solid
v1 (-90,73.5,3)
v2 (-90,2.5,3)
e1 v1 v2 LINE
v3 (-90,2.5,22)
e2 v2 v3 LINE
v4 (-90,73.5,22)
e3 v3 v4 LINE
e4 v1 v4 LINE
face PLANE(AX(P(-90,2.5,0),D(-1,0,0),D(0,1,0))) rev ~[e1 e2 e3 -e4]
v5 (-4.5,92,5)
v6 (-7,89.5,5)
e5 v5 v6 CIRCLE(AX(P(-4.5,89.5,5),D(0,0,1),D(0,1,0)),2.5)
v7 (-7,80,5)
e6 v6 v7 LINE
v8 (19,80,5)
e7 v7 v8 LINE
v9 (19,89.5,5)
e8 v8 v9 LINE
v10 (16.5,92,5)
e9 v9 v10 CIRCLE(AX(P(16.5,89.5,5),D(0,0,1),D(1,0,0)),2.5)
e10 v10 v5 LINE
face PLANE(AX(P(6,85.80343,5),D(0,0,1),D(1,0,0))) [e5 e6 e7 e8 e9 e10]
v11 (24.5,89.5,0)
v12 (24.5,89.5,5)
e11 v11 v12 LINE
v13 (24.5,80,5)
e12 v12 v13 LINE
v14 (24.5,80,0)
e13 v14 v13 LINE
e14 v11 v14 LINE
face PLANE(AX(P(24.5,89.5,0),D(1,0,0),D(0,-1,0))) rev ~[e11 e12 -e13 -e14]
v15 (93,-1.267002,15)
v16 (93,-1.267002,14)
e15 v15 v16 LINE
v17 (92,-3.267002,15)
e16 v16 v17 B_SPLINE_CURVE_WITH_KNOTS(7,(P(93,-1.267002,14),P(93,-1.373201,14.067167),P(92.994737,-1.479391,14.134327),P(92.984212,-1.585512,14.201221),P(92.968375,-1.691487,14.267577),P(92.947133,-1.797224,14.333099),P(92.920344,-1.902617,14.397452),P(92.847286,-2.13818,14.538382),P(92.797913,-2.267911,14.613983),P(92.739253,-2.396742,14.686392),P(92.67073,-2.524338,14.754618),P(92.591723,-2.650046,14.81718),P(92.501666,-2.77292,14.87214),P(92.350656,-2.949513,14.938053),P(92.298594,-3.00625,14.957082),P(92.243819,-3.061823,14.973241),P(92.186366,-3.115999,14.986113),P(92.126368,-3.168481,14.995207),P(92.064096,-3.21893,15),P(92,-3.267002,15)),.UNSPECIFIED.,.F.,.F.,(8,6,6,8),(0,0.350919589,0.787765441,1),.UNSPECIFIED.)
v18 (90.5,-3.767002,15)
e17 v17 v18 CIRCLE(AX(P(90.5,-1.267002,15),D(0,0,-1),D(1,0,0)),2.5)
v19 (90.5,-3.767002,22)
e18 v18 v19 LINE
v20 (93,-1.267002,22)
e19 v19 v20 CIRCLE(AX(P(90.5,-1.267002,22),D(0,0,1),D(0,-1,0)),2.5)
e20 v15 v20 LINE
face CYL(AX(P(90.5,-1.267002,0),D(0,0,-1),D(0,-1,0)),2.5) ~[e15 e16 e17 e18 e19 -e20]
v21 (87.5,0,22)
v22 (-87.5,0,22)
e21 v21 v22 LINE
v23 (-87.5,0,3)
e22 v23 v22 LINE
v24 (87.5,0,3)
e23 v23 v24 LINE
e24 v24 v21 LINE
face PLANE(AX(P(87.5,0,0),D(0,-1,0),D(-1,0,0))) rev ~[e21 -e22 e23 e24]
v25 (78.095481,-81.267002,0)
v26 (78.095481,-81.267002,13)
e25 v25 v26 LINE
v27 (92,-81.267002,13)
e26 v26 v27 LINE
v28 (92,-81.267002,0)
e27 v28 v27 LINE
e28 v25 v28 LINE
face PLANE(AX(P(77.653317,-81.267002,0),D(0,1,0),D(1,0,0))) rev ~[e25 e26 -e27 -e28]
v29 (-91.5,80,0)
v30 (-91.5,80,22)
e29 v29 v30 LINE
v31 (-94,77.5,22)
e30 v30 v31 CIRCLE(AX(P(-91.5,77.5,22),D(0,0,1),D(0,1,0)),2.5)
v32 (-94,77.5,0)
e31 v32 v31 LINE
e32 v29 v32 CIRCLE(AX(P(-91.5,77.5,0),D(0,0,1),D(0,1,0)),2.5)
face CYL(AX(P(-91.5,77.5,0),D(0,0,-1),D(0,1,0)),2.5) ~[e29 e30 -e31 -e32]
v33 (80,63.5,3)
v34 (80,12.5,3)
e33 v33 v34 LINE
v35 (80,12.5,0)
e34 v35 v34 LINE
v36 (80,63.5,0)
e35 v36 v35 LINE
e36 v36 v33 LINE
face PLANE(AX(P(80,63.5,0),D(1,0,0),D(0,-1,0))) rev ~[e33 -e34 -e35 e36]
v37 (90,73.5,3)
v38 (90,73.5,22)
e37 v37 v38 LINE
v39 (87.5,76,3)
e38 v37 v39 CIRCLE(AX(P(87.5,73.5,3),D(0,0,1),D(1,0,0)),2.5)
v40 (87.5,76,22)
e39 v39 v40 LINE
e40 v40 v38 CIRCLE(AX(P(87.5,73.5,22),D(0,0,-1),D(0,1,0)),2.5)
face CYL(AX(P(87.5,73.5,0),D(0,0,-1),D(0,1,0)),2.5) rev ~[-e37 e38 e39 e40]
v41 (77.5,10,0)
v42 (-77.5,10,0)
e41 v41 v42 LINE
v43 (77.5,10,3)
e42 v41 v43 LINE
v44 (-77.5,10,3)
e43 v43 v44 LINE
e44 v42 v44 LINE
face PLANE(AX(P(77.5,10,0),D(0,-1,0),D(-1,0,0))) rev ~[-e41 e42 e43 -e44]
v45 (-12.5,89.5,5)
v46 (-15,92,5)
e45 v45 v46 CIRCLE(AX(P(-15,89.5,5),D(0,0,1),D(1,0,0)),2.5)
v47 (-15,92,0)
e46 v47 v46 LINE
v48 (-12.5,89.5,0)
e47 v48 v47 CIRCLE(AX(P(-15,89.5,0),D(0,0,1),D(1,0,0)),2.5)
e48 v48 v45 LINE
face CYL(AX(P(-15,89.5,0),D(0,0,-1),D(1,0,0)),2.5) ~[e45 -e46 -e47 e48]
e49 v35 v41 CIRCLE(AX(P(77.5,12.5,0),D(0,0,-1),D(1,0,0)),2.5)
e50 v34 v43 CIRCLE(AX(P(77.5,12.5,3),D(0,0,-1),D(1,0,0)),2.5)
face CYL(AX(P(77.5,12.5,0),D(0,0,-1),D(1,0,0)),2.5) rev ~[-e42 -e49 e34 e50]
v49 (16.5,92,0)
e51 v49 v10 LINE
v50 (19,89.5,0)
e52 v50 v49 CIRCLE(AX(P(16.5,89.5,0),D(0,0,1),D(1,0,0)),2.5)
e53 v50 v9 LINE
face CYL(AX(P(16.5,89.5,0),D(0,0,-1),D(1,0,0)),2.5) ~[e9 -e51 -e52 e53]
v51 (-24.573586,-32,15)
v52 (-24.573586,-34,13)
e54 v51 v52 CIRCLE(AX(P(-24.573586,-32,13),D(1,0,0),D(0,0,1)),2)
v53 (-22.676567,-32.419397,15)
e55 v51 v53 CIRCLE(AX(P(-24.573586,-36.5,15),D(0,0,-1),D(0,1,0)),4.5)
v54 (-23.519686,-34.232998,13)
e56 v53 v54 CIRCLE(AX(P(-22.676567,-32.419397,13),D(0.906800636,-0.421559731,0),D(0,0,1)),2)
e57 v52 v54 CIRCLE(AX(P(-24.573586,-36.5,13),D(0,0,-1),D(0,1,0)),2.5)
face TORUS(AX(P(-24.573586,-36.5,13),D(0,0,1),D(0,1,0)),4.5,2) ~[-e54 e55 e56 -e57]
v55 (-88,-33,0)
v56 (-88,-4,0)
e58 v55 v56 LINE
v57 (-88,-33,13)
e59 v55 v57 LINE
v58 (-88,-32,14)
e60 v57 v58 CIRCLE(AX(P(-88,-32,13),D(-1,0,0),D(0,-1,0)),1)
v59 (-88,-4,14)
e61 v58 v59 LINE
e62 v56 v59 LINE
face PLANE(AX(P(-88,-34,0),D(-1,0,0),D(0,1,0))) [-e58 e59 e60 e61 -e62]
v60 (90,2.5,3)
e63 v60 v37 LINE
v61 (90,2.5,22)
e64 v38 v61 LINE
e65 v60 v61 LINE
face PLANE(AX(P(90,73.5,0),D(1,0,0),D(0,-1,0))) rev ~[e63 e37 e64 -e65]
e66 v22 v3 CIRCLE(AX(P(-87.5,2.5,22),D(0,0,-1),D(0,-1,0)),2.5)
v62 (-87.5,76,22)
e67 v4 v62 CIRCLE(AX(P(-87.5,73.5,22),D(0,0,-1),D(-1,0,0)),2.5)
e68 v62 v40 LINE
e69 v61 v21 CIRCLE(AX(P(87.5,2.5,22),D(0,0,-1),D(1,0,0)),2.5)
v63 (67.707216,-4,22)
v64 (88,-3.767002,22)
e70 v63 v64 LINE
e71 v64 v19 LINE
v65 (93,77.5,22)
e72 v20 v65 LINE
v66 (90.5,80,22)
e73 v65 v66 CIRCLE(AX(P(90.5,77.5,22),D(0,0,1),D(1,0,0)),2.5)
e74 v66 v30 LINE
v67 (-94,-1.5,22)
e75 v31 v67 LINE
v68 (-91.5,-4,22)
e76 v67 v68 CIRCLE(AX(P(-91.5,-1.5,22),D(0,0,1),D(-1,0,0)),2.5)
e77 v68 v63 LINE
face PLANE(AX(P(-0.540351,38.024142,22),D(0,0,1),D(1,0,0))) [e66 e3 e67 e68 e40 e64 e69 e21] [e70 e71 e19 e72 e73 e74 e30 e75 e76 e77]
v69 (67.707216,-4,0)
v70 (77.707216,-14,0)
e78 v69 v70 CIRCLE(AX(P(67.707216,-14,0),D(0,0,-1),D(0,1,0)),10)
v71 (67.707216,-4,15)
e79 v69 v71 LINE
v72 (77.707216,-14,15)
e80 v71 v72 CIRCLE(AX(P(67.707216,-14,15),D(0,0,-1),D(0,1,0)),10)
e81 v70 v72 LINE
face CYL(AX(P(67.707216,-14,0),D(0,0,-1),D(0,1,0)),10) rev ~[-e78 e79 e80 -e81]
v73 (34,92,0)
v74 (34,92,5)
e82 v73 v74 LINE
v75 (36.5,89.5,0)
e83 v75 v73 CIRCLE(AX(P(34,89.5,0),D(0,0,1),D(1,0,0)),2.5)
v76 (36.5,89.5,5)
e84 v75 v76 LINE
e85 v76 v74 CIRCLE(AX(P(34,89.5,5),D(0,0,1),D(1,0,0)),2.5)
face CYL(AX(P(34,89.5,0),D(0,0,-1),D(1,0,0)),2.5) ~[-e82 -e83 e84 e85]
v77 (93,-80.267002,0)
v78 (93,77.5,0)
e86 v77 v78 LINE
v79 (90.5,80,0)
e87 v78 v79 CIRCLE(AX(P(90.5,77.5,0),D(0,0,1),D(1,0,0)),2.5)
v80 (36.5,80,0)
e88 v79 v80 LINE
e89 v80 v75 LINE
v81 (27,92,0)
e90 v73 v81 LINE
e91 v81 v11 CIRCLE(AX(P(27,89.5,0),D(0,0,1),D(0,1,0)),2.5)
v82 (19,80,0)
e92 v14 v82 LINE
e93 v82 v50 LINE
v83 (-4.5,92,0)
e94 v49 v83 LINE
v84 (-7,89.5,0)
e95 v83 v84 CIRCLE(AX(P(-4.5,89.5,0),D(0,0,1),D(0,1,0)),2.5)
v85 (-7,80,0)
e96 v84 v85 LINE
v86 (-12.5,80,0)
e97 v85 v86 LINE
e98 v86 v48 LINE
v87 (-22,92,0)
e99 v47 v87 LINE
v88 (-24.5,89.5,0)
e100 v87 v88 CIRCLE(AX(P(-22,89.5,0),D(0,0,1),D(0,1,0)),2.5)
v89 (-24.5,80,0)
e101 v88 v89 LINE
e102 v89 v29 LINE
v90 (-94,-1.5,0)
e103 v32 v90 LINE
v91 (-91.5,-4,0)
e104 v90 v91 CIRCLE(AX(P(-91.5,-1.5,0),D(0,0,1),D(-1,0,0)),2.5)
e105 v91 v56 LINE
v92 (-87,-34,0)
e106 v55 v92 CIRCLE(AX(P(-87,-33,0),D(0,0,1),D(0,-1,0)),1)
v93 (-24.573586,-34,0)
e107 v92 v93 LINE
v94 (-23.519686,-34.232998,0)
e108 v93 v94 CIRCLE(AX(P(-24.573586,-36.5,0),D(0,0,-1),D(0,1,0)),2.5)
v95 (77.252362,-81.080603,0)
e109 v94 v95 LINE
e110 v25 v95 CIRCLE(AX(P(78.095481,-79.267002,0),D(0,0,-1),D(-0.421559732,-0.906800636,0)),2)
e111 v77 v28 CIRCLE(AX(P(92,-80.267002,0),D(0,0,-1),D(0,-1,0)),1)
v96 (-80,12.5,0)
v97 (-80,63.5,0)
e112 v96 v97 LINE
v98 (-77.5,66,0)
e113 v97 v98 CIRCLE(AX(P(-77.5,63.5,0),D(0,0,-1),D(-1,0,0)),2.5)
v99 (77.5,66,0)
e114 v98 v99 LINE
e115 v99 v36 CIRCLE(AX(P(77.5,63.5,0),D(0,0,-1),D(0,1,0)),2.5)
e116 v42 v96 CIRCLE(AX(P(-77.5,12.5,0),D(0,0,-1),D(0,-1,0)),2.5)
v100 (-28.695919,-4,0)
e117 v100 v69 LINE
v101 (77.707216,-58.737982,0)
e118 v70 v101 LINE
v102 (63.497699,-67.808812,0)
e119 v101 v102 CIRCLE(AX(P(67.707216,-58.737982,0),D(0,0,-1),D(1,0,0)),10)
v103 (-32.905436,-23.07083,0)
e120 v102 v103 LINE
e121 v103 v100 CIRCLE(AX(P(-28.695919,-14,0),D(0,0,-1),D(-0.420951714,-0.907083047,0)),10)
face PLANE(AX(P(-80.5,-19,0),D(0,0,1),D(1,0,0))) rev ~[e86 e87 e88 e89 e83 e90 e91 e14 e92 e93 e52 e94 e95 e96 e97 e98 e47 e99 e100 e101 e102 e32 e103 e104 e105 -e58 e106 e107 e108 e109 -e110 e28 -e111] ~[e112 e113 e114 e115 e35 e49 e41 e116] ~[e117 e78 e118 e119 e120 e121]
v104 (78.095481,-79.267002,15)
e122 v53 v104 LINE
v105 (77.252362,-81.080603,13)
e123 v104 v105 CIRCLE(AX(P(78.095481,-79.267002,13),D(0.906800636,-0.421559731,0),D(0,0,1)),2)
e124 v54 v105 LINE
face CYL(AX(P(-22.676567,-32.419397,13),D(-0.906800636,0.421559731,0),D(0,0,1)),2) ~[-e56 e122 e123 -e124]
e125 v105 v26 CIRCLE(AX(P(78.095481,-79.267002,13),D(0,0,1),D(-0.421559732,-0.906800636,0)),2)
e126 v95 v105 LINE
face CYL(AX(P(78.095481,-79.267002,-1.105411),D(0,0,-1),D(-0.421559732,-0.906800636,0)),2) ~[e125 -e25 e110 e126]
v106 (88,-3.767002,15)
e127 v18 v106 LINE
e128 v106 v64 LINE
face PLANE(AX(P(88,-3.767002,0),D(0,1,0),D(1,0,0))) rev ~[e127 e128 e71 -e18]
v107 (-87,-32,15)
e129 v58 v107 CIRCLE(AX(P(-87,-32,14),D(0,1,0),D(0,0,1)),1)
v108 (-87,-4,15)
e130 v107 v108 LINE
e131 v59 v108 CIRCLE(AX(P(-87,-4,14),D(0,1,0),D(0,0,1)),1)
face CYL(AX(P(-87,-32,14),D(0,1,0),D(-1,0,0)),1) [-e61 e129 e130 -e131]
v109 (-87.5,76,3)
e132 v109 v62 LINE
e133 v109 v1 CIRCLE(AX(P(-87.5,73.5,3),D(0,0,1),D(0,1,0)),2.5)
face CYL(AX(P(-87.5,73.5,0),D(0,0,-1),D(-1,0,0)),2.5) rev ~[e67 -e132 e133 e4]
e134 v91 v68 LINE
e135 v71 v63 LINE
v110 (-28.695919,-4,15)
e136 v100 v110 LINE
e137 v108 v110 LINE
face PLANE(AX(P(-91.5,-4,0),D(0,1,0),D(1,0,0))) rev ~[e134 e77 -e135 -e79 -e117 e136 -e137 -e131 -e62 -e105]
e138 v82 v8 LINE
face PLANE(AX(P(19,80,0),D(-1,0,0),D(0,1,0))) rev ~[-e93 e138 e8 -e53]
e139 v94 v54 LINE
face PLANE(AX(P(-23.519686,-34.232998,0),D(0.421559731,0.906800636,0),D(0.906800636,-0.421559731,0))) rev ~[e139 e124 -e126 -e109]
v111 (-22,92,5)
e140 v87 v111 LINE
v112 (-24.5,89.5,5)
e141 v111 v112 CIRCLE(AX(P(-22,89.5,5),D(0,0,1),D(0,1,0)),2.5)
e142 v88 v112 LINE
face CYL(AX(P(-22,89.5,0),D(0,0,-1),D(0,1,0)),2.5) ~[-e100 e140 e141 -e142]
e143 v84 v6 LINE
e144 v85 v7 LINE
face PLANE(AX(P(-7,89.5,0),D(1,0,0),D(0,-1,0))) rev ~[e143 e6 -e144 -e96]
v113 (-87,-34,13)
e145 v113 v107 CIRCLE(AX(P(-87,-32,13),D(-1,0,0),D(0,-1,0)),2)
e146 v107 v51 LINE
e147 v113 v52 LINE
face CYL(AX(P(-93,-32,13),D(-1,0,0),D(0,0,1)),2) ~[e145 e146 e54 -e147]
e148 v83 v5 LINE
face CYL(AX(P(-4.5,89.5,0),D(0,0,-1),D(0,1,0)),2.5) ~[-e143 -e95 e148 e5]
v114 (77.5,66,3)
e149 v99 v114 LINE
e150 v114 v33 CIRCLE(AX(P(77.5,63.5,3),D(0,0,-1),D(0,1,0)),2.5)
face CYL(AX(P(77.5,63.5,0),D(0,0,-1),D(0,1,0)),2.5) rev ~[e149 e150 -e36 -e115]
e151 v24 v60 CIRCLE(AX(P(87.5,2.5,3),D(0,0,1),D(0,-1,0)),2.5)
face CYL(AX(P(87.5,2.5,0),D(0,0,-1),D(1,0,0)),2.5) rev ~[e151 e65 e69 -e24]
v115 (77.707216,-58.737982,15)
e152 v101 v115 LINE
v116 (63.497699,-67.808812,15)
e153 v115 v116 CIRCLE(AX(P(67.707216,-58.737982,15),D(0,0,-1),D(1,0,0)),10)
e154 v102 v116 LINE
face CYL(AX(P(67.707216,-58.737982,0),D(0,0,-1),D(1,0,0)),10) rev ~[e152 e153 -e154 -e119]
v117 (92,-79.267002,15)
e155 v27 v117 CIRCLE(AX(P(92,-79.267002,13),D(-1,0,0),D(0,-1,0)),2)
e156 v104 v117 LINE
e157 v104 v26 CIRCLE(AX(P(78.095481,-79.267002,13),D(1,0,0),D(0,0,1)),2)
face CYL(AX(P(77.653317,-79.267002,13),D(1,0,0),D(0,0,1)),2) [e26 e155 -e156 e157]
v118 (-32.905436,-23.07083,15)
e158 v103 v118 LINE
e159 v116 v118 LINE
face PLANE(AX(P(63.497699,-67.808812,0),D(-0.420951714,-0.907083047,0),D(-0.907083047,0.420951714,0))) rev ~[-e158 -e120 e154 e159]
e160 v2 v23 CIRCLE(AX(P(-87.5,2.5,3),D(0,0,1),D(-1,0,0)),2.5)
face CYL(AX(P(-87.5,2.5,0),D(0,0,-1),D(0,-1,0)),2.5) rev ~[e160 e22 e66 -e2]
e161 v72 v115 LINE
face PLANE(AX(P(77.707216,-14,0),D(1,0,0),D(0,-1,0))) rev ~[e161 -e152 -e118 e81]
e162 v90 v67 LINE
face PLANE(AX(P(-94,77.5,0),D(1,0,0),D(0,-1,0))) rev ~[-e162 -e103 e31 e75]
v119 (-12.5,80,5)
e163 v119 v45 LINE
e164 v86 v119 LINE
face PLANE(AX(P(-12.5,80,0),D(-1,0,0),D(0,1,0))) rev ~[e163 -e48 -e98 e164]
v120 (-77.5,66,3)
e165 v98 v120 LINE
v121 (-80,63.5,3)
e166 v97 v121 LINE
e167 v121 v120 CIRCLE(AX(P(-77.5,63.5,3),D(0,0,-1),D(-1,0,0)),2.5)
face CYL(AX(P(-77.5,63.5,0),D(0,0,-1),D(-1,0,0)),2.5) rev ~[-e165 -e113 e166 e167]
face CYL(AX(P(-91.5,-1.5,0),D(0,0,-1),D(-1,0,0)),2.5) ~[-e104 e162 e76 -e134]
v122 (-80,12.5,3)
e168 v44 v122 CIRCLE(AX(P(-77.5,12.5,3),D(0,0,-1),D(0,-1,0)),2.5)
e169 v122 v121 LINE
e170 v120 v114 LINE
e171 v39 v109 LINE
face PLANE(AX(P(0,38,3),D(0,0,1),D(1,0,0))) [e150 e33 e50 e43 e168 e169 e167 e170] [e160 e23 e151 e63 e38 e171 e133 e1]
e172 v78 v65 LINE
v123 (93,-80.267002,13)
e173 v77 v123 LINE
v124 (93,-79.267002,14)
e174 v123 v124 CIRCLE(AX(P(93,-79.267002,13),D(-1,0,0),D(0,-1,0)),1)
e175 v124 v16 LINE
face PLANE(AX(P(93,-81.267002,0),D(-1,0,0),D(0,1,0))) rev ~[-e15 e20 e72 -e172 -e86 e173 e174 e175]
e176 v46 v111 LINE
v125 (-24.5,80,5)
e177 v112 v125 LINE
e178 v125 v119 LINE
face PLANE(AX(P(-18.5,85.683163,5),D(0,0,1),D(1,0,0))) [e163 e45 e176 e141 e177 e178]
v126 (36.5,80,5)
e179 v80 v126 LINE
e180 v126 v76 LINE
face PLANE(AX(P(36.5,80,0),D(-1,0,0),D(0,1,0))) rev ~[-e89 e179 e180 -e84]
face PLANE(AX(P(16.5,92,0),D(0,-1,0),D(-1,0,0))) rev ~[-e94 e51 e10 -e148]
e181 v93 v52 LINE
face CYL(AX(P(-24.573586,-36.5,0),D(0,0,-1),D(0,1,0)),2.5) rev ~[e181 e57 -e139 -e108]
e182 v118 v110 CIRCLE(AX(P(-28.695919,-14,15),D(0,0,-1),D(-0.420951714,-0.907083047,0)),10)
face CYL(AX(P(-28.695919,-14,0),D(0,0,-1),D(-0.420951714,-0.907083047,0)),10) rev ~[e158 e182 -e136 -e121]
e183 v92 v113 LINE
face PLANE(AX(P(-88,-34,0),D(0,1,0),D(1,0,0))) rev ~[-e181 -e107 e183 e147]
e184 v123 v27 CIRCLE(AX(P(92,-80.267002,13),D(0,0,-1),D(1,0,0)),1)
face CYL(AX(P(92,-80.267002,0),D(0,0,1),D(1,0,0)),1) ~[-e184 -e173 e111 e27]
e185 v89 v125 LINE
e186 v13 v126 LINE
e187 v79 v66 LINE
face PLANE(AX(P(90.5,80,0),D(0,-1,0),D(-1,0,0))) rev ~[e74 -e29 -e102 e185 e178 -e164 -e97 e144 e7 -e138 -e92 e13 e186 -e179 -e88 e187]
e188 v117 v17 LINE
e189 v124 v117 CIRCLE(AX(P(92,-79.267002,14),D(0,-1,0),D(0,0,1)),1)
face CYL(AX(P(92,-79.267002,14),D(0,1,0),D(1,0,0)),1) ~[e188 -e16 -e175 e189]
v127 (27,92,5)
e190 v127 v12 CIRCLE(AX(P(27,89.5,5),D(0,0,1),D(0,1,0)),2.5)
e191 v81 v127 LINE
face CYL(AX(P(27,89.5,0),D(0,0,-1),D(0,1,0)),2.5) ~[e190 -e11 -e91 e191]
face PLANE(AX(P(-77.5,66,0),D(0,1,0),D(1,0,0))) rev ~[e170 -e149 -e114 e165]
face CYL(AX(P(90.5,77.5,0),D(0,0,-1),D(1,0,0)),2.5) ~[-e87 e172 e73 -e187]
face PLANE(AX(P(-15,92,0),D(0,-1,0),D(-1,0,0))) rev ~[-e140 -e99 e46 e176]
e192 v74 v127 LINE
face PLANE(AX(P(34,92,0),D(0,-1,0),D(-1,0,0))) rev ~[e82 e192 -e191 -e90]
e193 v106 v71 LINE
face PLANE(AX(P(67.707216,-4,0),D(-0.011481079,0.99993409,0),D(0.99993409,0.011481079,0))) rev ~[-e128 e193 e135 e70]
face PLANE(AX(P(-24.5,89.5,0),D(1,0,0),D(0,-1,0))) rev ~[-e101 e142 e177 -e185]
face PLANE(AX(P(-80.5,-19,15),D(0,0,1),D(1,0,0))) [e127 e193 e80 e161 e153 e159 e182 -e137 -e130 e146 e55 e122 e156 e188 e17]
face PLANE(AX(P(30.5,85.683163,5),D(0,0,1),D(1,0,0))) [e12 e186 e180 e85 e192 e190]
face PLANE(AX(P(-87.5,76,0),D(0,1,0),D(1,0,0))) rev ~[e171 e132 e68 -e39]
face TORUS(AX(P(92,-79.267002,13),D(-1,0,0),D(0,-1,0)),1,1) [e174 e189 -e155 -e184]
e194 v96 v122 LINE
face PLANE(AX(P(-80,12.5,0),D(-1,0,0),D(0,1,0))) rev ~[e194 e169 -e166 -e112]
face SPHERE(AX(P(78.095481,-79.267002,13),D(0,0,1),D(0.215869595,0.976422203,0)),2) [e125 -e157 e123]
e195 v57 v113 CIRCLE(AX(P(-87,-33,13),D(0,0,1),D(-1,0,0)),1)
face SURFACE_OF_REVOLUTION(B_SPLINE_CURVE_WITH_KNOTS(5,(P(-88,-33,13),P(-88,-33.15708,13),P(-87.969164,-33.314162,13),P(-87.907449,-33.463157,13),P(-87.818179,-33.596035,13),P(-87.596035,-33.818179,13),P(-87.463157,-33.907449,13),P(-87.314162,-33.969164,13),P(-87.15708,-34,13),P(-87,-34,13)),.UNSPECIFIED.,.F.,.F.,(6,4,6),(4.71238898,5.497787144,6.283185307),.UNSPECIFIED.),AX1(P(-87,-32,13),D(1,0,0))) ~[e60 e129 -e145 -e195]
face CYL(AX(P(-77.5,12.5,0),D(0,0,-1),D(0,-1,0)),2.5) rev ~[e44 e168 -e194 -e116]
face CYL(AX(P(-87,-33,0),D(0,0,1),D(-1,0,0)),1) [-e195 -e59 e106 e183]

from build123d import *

# Parameters (mm, degrees)
F1_DEPTH     = 22
F2_DEPTH     = 3
F3_DEPTH     = 15
F0_W         = 15
F0_H         = 30
F4_DEPTH     = 15
F5_R         = 2
F6_T1_DEPTH  = 111.1292207426
F6_T3_DEPTH  = 68.4264144678
F6_T5_DEPTH  = 14.1054111362
F6_T10_DEPTH = 2
F6_T14_ANGLE = 24.9330990778
F7_R         = 1
F8_R         = 1
F9_DEPTH     = 5


# Not quite as in the source:
# - a fillet or chamfer that OpenCascade refuses, or shapes differently, is made with other operations: its cross-section is extruded or revolved along the edge and cut away or added
# - a feature names something its author has since deleted; it is built from what else it names


with BuildPart() as f1:
    # F0 (on Top) → F1 (new body)
    with BuildSketch(Plane.XY):
        with BuildLine():
            ThreePointArc((93, 77.5), (92.267766953, 79.267766953), (90.5, 80))
            Line((90.5, 80), (36.5, 80))
            Line((36.5, 80), (24.5, 80))
            Line((24.5, 80), (19, 80))
            Line((19, 80), (-7, 80))
            Line((-7, 80), (-12.5, 80))
            Line((-12.5, 80), (-24.5, 80))
            Line((-24.5, 80), (-74, 80))
            Line((-74, 80), (-91.5, 80))
            ThreePointArc((-91.5, 80), (-93.267766953, 79.267766953), (-94, 77.5))
            Line((-94, 77.5), (-94, 76))
            Line((-94, 76), (-94, 0))
            Line((-94, 0), (-94, -1.5))
            ThreePointArc((-94, -1.5), (-93.267766953, -3.267766953), (-91.5, -4))
            Line((-91.5, -4), (-88, -4))
            Line((-88, -4), (-73, -4))
            Line((-73, -4), (-28.6959191337, -4))
            Line((-28.6959191337, -4), (67.7072161436, -4))
            Line((67.7072161436, -4), (88, -3.7670015892))
            Line((88, -3.7670015892), (90.5, -3.7670015892))
            ThreePointArc((90.5, -3.7670015892), (92.267766953, -3.0347685421), (93, -1.2670015892))
            Line((93, -1.2670015892), (93, 0))
            Line((93, 0), (93, 76))
            Line((93, 76), (93, 77.5))
        make_face()
        with BuildLine():
            ThreePointArc((90, 2.5), (89.267766953, 0.732233047), (87.5, 0))
            Line((87.5, 0), (-87.5, 0))
            ThreePointArc((-87.5, 0), (-89.267766953, 0.732233047), (-90, 2.5))
            Line((-90, 2.5), (-90, 73.5))
            ThreePointArc((-90, 73.5), (-89.267766953, 75.267766953), (-87.5, 76))
            Line((-87.5, 76), (87.5, 76))
            ThreePointArc((87.5, 76), (89.267766953, 75.267766953), (90, 73.5))
            Line((90, 73.5), (90, 2.5))
        make_face(mode=Mode.SUBTRACT)
    extrude(amount=F1_DEPTH)

    # F0 (on Top) → F2 (join)
    with BuildSketch(Plane.XY):
        with BuildLine():
            Line((-87.5, 0), (87.5, 0))
            ThreePointArc((87.5, 0), (89.267766953, 0.732233047), (90, 2.5))
            Line((90, 2.5), (90, 73.5))
            ThreePointArc((90, 73.5), (89.267766953, 75.267766953), (87.5, 76))
            Line((87.5, 76), (-87.5, 76))
            ThreePointArc((-87.5, 76), (-89.267766953, 75.267766953), (-90, 73.5))
            Line((-90, 73.5), (-90, 2.5))
            ThreePointArc((-90, 2.5), (-89.267766953, 0.732233047), (-87.5, 0))
        make_face()
        with BuildLine():
            Line((-77.5, 66), (77.5, 66))
            ThreePointArc((77.5, 66), (79.267766953, 65.267766953), (80, 63.5))
            Line((80, 63.5), (80, 12.5))
            ThreePointArc((80, 12.5), (79.267766953, 10.732233047), (77.5, 10))
            Line((77.5, 10), (-77.5, 10))
            ThreePointArc((-77.5, 10), (-79.267766953, 10.732233047), (-80, 12.5))
            Line((-80, 12.5), (-80, 63.5))
            ThreePointArc((-80, 63.5), (-79.267766953, 65.267766953), (-77.5, 66))
        make_face(mode=Mode.SUBTRACT)
    extrude(amount=F2_DEPTH)

    # F0 (on Top) → F3 (join)
    with BuildSketch(Plane.XY):
        with BuildLine():
            Line((93, -81.2670015892), (93, -1.2670015892))
            ThreePointArc((93, -1.2670015892), (92.267766953, -3.0347685421), (90.5, -3.7670015892))
            Line((90.5, -3.7670015892), (88, -3.7670015892))
            Line((88, -3.7670015892), (67.7072161436, -4))
            ThreePointArc((67.7072161436, -4), (74.7782839555, -6.9289321881), (77.7072161436, -14))
            Line((77.7072161436, -14), (77.7072161436, -58.7379819401))
            ThreePointArc((77.7072161436, -58.7379819401), (73.0879609173, -67.1669549309), (63.4976990076, -67.8088124137))
            Line((63.4976990076, -67.8088124137), (-32.9054362697, -23.0708304737))
            ThreePointArc((-32.9054362697, -23.0708304737), (-38.4608642113, -11.8445771571), (-28.6959191337, -4))
            Line((-28.6959191337, -4), (-73, -4))
            Line((-73, -4), (-73, -34))
            Line((-73, -34), (-24.5735855322, -34))
            ThreePointArc((-24.5735855322, -34), (-24.033911544, -34.0589444934), (-23.5196862036, -34.2329984108))
            Line((-23.5196862036, -34.2329984108), (77.653316815, -81.2670015892))
            Line((77.653316815, -81.2670015892), (93, -81.2670015892))
        make_face()
    extrude(amount=F3_DEPTH)

    # F0 (on Top) → F4 (join)
    with BuildSketch(Plane.XY):
        with Locations((-80.5, -19)):
            Rectangle(F0_W, F0_H)
    extrude(amount=F4_DEPTH)

    # F5
    f5_edges = [f1.edges().sort_by_distance(p)[0] for p in [
        (85.326658, -81.267002, 15),
    ]]
    fillet(f5_edges, radius=F5_R)

    # F6: fillet of radius 2 on 4 edges, made by hand

    # F6_s2 → F6_t1 (cut)
    with BuildSketch(Plane(origin=(-6.2536714965, 2.9072499211, 0), x_dir=(0, 0, 1), z_dir=(0.9068006357, -0.4215597314, 0))):
        with BuildLine():
            ThreePointArc((15, 38.9574573188), (14.4142135624, 40.3716708812), (13, 40.9574573188))
            Line((13, 40.9574573188), (15, 40.9574573188))
            Line((15, 40.9574573188), (15, 38.9574573188))
        make_face()
    extrude(amount=F6_T1_DEPTH, mode=Mode.SUBTRACT)

    # F6_s4 → F6_t3 (cut)
    with BuildSketch(Plane.YZ.offset(-93)):
        with BuildLine():
            ThreePointArc((-32, 15), (-33.4142135624, 14.4142135624), (-34, 13))
            Line((-34, 13), (-34, 15))
            Line((-34, 15), (-32, 15))
        make_face()
    extrude(amount=F6_T3_DEPTH, mode=Mode.SUBTRACT)

    # F6_s6 → F6_t5 (cut)
    with BuildSketch(Plane.XY.offset(-1.1054111362)):
        with BuildLine():
            ThreePointArc((77.2523618067, -81.0806028605), (77.6637420789, -81.2198459945), (78.0954812695, -81.2670015892))
            Line((78.0954812695, -81.2670015892), (77.653316815, -81.2670015892))
            Line((77.653316815, -81.2670015892), (77.2523618067, -81.0806028605))
        make_face()
    extrude(amount=F6_T5_DEPTH, mode=Mode.SUBTRACT)


with BuildPart() as f6_tool8:
    # F6_s9 → F6_t10 (new body)
    with BuildSketch(Plane.XY.offset(13)):
        Polygon((78.0954812695, -79.2670015892), (78.0954812695, -81.2670015892), (77.653316815, -81.2670015892), (77.2523618067, -81.0806028605), align=None)
    extrude(amount=F6_T10_DEPTH)

    # F6_s11 → F6_t12 (revolve, cut)
    with BuildSketch(Plane(origin=(78.0954812695, -79.2670015892, 13), x_dir=(0.2158695953, 0.9764222027, 0), z_dir=(0.9764222027, -0.2158695953, 0))):
        with BuildLine():
            ThreePointArc((0, -2), (2, 0), (0, 2))
            Line((0, 2), (0, -2))
        make_face()
    revolve(axis=Axis((78.0954812695, -79.2670015892, 13), (0, 0, 1)), mode=Mode.SUBTRACT)


with BuildPart() as f1_1:
    add(f1.part)

    # F6_t7: cut F6_tool8
    add(f6_tool8.part, mode=Mode.SUBTRACT)

    # F6_s13 → F6_t14 (revolve, cut)
    with BuildSketch(Plane.YZ.offset(-24.5735855322)):
        with BuildLine():
            ThreePointArc((-32, 15), (-33.4142135624, 14.4142135624), (-34, 13))
            Line((-34, 13), (-34, 15))
            Line((-34, 15), (-32, 15))
        make_face()
    revolve(axis=Axis((-24.5735855322, -36.5, 15), (0, 0, -1)), revolution_arc=F6_T14_ANGLE, mode=Mode.SUBTRACT)

    # F7
    f7_edges = [f1_1.edges().sort_by_distance(p)[0] for p in [
        (93, -81.267002, 6.5),
    ]]
    fillet(f7_edges, radius=F7_R)

    # F8
    f8_edges = [f1_1.edges().sort_by_distance(p)[0] for p in [
        (-88, -34, 6.5),
        (-88, -18, 15),
        (-88, -33.414214, 14.414214),
    ]]
    fillet(f8_edges, radius=F8_R)

    # F0 (on Top) → F9 (join)
    with BuildSketch(Plane.XY):
        with BuildLine():
            Line((-24.5, 80), (-12.5, 80))
            Line((-12.5, 80), (-12.5, 89.5))
            ThreePointArc((-12.5, 89.5), (-13.232233047, 91.267766953), (-15, 92))
            Line((-15, 92), (-22, 92))
            ThreePointArc((-22, 92), (-23.767766953, 91.267766953), (-24.5, 89.5))
            Line((-24.5, 89.5), (-24.5, 80))
        make_face()
        with BuildLine():
            Line((-7, 80), (19, 80))
            Line((19, 80), (19, 89.5))
            ThreePointArc((19, 89.5), (18.267766953, 91.267766953), (16.5, 92))
            Line((16.5, 92), (-4.5, 92))
            ThreePointArc((-4.5, 92), (-6.267766953, 91.267766953), (-7, 89.5))
            Line((-7, 89.5), (-7, 80))
        make_face()
        with BuildLine():
            Line((24.5, 80), (36.5, 80))
            Line((36.5, 80), (36.5, 89.5))
            ThreePointArc((36.5, 89.5), (35.767766953, 91.267766953), (34, 92))
            Line((34, 92), (27, 92))
            ThreePointArc((27, 92), (25.232233047, 91.267766953), (24.5, 89.5))
            Line((24.5, 89.5), (24.5, 80))
        make_face()
    extrude(amount=F9_DEPTH)


solid = f1_1.part
